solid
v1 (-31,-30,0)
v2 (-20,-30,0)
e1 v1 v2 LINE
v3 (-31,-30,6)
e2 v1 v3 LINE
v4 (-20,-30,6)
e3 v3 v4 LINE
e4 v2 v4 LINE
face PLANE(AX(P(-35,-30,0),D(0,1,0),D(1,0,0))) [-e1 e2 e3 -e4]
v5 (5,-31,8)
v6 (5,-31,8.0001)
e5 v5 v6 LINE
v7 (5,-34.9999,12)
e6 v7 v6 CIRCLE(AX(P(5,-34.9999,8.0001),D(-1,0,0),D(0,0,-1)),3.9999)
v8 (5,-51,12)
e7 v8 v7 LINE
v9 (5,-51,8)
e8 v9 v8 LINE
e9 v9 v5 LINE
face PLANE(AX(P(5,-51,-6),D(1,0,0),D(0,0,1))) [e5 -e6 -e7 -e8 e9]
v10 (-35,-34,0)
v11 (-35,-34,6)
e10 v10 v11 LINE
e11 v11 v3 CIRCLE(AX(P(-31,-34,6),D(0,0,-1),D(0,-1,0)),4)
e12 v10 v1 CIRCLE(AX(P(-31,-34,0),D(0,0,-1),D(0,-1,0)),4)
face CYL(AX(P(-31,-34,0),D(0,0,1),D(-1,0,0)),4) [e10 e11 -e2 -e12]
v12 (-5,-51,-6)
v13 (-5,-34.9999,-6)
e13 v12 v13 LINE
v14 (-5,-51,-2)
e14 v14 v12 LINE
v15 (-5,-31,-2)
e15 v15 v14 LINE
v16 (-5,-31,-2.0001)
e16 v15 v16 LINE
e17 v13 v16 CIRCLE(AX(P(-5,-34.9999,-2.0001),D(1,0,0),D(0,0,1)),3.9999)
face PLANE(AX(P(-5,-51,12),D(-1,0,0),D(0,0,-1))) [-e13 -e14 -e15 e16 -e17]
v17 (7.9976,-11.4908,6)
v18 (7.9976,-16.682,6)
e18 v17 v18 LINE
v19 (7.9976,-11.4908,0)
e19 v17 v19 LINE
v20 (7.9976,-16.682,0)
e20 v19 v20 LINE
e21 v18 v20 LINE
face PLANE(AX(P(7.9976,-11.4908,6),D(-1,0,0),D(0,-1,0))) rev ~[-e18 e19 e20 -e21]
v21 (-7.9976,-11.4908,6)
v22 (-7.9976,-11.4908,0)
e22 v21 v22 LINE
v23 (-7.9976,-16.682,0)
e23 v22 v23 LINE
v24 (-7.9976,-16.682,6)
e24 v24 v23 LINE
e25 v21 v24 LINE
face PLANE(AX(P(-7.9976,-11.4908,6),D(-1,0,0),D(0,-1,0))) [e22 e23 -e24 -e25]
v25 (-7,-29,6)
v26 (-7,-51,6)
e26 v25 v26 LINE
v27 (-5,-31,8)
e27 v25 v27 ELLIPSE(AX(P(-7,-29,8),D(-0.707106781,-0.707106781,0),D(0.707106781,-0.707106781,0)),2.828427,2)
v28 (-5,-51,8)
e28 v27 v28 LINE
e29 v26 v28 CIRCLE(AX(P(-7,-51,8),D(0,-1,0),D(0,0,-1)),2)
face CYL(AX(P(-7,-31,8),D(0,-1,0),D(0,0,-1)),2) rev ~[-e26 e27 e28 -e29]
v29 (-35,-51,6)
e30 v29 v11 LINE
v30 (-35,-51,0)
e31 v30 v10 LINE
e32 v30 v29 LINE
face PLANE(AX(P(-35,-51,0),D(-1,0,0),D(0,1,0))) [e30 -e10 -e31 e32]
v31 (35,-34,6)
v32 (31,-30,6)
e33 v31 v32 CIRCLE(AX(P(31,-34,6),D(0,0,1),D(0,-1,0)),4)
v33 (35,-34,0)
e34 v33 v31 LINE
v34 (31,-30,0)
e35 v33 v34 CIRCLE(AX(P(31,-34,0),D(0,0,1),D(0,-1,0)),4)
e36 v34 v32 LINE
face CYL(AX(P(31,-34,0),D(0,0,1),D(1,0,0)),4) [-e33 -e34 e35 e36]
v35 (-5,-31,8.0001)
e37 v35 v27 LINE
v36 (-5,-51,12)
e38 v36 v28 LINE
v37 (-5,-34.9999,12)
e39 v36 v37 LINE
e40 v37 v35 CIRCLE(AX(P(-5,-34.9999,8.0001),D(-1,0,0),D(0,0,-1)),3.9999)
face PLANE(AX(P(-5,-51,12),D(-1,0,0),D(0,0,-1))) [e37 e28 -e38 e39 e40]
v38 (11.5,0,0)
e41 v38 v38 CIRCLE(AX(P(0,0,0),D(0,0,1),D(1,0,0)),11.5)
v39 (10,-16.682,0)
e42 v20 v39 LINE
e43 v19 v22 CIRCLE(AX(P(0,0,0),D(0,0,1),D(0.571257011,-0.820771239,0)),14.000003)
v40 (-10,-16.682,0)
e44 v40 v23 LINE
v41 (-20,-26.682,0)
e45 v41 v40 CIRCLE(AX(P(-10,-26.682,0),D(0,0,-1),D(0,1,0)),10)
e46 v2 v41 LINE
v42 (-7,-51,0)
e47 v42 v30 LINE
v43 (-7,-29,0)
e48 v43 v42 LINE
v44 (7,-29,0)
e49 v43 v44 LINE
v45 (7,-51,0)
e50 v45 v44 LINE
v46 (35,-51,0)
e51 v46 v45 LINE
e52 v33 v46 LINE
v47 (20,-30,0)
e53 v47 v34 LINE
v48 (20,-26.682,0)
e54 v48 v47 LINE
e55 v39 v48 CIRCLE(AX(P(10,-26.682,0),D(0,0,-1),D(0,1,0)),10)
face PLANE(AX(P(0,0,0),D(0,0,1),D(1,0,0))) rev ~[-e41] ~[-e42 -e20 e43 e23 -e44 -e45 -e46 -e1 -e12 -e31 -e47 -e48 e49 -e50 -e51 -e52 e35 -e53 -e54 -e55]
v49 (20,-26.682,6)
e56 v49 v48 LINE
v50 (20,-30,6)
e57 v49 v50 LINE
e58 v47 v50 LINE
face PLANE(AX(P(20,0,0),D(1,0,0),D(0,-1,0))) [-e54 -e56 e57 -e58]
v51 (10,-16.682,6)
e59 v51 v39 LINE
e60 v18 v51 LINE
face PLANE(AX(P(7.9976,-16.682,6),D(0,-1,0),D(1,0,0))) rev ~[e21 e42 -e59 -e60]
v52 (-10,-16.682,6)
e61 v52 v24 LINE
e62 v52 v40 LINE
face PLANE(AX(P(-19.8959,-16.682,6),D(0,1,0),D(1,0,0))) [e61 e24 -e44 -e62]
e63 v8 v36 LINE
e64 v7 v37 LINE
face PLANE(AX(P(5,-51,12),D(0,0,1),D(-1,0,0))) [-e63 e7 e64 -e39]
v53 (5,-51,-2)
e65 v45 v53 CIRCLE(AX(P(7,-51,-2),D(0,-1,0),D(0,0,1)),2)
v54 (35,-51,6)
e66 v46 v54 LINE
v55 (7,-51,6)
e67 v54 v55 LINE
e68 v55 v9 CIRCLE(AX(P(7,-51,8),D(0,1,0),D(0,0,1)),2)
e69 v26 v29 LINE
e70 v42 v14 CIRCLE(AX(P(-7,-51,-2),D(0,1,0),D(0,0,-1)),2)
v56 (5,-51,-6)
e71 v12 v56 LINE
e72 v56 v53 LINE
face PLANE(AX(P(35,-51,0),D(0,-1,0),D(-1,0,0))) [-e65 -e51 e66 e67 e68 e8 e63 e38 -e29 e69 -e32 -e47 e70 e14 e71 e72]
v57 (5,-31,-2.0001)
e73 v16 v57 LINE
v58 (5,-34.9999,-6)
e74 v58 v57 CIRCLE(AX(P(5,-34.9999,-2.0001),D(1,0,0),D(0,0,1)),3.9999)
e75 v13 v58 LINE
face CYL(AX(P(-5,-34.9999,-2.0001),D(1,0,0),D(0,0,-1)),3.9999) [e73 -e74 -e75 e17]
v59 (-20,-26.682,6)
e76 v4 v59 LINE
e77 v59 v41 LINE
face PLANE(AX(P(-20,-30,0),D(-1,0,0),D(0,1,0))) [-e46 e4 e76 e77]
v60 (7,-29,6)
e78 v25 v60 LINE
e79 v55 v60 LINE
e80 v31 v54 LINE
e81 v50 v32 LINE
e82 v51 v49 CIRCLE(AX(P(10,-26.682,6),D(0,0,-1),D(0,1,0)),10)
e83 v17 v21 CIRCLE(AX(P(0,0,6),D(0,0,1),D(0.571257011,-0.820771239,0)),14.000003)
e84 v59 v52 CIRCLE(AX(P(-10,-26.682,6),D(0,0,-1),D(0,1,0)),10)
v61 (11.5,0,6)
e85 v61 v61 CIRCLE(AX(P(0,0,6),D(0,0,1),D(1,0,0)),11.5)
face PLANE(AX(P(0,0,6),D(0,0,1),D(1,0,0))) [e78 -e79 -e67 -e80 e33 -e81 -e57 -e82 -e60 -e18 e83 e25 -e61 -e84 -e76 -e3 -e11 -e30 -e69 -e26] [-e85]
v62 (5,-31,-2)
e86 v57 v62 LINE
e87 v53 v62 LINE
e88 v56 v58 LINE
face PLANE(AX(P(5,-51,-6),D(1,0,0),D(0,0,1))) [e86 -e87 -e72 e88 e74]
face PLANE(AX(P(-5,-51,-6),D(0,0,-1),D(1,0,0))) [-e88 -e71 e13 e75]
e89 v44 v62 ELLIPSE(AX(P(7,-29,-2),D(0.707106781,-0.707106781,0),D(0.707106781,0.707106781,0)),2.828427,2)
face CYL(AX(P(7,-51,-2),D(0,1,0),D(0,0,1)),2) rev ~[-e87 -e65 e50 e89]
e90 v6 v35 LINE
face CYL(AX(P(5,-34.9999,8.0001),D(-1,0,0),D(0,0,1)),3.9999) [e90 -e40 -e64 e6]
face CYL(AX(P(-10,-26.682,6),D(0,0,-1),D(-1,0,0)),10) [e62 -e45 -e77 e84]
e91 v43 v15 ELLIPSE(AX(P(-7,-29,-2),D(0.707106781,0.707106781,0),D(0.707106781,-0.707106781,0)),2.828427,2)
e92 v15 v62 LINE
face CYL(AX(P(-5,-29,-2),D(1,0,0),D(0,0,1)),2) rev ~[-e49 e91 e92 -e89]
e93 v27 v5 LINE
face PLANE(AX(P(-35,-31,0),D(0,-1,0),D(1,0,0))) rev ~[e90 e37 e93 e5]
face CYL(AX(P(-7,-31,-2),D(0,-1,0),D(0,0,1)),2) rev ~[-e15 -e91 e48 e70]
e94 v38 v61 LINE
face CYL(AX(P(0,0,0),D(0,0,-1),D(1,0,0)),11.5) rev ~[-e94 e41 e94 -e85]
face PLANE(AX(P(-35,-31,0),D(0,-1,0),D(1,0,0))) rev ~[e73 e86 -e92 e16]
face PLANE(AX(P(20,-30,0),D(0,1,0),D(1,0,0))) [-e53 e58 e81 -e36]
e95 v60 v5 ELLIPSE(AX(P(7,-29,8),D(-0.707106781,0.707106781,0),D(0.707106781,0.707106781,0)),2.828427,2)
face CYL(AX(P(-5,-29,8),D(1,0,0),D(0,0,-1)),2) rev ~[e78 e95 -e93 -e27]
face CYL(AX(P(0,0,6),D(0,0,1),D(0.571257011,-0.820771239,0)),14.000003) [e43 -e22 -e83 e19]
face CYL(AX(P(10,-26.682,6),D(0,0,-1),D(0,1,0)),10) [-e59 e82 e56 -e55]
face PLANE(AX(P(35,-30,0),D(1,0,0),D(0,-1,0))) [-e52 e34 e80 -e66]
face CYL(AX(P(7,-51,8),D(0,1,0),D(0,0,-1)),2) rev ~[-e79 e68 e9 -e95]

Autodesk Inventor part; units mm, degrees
ref_plane "YZ Plane" through (0, 0, 0) normal (1, 0, 0) x (0, 1, 0)
ref_plane "XZ Plane" through (0, 0, 0) normal (0, 1, 0) x (-1, 0, 0)
ref_plane "XY Plane" through (0, 0, 0) normal (0, 0, 1) x (1, 0, 0)
sketch "Sketch1" plane through (0, 0, 0) normal (0, 0, 1) x (1, 0, 0)
  circle A0 centre (0, 0) radius 11.5
  arc A1 (20, 0) -> (-20, 0) centre (0, 0) ccw
  line L0 (20, 0) -> (20, -30)
  line L1 (-20, -30) -> (-20, 0)
  line L2 (35, -30) -> (35, -51)
  line L3 (35, -51) -> (-35, -51)
  line L4 (-35, -51) -> (-35, -30)
  line L5 (-35, -30) -> (-20, -30)
  line L6 (20, -30) -> (35, -30)
extrude "Extrusion1" add sketch "Sketch1" along normal blind 6
sketch "Sketch2" plane through (-35, -51, 0) normal (0, -1, 0) x (1, 0, 0)
  line L0 (30, 12) -> (30, -6)
  line L1 (30, -6) -> (40, -6)
  line L2 (40, -6) -> (40, 12)
  line L3 (40, 12) -> (30, 12)
  line L4 (30, 12) -> (40, -6) construction
  line L5 (30, -6) -> (40, 12) construction
  point P0 (35, 0)
  point P1 (35, 3)
  dimension "d7" = 18
  dimension "d8" = 10
extrude "Extrusion2" add sketch "Sketch2" against normal blind 20
fillet "Fillet1" radius 2 6 edges at (5, -41, 6) (-5, -41, 6) (5, -41, 0) (-5, -41, 0) (0, -31, 0) (0, -31, 6)
fillet "Fillet2" radius 4 2 edges at (0, -31, 12) (0, -31, -6)
fillet "Fillet3" radius 4 2 edges at (-35, -30, 3) (35, -30, 3)
sketch "Sketch3" plane through (0, 0, 6) normal (0, 0, 1) x (1, 0, 0)
  arc A0 (7.9976, -11.4908) -> (-7.9976, -11.4908) centre (0, 0) ccw
  arc A1 (7.9976, -16.682) -> (-7.9976, -16.682) centre (0, 0) ccw
  line L0 (4, -12.8417) -> (-4, -19.4934) construction
  line L1 (-4, -12.8417) -> (4, -19.4934) construction
  line L2 (-7.9976, -11.4908) -> (-7.9976, -16.682)
  line L3 (7.9976, -11.4908) -> (7.9976, -16.682)
  point P0 (0, -16.1675)
extrude "Extrusion3" cut sketch "Sketch3" against normal blind 10
sketch "Sketch4" plane through (0, 0, 6) normal (0, 0, 1) x (1, 0, 0)
  line L0 (-7.9976, -11.4908) -> (-7.9976, -16.682) projected
  line L1 (-7.9976, -16.682) -> (-19.8959, -16.682)
  arc A0 (7.9976, -16.682) -> (-7.9976, -16.682) centre (0, 0) ccw projected
  line L2 (7.9976, -16.682) -> (20, -16.682)
  line L3 (20, -30) -> (20, 0) projected
  line L4 (-7.9976, -16.682) -> (-17.0011, 1.4894)
  line L5 (-17.0011, 1.4894) -> (-8.7801, 14.2319)
  line L6 (-8.7801, 14.2319) -> (1.2495, 15.1362)
  line L7 (1.2495, 15.1362) -> (10.7036, 12.5877)
  line L8 (10.7036, 12.5877) -> (15.6744, 3.4985)
  line L9 (15.6744, 3.4985) -> (15.6744, -3.8181)
  line L10 (15.6744, -3.8181) -> (10.5163, -11.3974)
  line L11 (10.5163, -11.3974) -> (8.7045, -14.0594)
  line L12 (8.7045, -14.0594) -> (7.9976, -16.682)
  line L13 (-19.8959, -16.682) -> (-31.3329, 15.1362)
  line L14 (-31.3329, 15.1362) -> (-3.7653, 25.0453)
  line L15 (-3.7653, 25.0453) -> (28.3359, 16.3269)
  line L16 (28.3359, 16.3269) -> (26.8111, -11.3974)
  line L17 (26.8111, -11.3974) -> (20, -16.682)
extrude "Extrusion4" cut sketch "Sketch4" against normal blind 10
sketch "Sketch5" plane through (-19.8959, -16.682, 6) normal (0, 1, 0) x (1, 0, 0)
  line L0 (-7.0101, -7.2709) -> (2.851, -7.2709)
  line L1 (2.851, -7.2709) -> (2.851, 8.3942)
  line L2 (2.851, 8.3942) -> (-7.0101, 8.3942)
  line L3 (-7.0101, 8.3942) -> (-7.0101, -7.2709)
  point P0 (19.8959, 6)
extrude "Extrusion5" cut sketch "Sketch5" along normal blind 10
fillet "Fillet4" radius 10 2 edges at (-20, -16.682, 3) (20, -16.682, 3)
properties part number "Secondary mount"
